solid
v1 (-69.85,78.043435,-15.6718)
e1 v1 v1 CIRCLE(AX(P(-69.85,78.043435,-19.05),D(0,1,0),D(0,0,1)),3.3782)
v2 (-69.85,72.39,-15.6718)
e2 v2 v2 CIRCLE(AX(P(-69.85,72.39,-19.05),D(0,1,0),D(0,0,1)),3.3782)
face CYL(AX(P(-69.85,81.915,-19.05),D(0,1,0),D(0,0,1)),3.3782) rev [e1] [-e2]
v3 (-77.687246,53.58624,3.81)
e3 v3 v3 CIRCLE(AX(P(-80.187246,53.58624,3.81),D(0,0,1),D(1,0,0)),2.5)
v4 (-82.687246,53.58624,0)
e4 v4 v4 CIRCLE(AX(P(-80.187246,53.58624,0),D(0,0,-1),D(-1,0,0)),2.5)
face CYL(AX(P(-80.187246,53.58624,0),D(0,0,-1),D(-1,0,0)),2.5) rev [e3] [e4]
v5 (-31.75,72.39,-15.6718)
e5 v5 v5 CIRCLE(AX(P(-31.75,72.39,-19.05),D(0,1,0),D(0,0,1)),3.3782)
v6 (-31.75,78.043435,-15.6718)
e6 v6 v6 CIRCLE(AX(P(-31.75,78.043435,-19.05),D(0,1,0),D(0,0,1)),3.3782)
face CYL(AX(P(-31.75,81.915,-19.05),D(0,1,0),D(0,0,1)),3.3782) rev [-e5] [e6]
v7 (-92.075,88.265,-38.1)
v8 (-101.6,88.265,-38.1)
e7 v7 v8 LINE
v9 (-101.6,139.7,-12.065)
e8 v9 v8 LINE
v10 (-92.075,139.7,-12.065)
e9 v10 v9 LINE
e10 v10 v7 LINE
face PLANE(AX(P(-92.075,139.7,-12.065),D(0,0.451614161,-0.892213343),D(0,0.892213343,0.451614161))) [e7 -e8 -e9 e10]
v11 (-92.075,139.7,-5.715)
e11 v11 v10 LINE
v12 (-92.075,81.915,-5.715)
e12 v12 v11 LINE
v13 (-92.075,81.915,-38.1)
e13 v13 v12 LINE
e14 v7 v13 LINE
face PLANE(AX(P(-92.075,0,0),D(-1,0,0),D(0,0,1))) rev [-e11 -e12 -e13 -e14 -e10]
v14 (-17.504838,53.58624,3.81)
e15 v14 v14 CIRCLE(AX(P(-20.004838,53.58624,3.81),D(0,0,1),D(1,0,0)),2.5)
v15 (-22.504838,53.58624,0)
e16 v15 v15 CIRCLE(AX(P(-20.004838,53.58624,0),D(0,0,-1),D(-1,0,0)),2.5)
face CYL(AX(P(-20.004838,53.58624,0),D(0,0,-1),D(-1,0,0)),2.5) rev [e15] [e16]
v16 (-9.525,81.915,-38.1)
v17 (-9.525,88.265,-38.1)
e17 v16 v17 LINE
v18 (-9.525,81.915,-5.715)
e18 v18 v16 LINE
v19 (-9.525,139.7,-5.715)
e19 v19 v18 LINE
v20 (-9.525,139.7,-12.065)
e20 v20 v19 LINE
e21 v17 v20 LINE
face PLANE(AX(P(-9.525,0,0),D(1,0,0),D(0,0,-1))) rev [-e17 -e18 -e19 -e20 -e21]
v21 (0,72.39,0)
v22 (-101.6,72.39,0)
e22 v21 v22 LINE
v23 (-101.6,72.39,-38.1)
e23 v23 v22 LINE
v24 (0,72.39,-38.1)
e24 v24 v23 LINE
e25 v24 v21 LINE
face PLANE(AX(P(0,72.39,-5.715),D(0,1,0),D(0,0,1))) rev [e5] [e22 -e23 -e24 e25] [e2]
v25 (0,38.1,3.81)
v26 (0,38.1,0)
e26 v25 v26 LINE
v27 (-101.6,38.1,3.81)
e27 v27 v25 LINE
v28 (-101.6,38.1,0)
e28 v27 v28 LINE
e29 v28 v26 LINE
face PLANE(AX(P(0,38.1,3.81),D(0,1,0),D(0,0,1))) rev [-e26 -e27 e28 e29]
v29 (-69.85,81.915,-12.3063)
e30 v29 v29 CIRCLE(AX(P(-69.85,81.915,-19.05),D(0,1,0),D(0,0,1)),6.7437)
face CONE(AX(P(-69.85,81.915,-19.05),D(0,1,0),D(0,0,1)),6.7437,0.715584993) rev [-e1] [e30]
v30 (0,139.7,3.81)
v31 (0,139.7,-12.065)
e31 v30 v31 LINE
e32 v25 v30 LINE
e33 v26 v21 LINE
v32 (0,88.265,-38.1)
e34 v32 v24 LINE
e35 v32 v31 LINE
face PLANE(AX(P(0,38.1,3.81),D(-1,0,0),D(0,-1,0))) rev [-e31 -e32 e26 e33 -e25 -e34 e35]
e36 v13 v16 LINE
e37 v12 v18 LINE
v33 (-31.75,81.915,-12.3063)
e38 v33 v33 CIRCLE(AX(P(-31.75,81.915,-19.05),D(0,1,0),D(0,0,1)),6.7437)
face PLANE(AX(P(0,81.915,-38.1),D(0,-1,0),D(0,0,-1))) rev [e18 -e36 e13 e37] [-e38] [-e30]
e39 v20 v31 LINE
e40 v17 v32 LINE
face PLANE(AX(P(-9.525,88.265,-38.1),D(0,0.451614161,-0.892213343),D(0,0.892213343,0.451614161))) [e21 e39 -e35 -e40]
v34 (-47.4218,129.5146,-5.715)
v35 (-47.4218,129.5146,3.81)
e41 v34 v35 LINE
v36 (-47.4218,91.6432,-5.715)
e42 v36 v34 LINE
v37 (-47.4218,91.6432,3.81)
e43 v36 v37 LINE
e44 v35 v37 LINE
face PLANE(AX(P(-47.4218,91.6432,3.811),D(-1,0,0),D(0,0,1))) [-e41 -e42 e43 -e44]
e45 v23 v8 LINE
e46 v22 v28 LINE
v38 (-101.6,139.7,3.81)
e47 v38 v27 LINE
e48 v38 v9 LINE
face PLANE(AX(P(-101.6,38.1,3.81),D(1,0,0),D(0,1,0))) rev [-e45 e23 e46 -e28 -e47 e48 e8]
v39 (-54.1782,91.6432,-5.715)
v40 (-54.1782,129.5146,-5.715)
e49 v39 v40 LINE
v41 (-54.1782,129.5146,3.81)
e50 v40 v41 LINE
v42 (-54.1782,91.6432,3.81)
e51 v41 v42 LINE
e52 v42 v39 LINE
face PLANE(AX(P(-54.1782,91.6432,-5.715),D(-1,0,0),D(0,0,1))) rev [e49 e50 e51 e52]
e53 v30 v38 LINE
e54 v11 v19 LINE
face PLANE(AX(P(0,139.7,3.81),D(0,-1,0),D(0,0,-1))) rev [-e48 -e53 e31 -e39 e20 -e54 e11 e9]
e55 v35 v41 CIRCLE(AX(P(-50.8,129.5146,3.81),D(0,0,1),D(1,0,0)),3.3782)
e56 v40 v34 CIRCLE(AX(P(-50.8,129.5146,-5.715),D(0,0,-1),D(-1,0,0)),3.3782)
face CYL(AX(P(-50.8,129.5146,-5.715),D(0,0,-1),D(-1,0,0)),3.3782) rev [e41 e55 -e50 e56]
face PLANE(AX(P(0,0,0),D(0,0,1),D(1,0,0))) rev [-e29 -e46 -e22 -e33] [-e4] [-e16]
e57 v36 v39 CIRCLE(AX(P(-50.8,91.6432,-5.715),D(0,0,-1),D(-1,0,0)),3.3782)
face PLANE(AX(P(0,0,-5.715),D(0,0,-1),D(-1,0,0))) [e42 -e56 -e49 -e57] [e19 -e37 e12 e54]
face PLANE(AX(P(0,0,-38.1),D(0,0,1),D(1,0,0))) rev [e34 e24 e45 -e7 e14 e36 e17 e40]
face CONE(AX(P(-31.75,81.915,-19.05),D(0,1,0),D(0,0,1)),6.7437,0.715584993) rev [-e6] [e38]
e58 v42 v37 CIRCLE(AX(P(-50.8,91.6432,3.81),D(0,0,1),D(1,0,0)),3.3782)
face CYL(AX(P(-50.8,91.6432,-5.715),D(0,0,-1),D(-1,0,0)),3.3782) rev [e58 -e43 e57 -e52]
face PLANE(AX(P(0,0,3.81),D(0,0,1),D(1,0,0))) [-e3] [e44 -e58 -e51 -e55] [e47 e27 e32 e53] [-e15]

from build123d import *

# Parameters (mm, degrees)
SKETCH1_W                                           = 101.6
SKETCH1_H                                           = 101.6
BOSS_EXTRUDE1_DEPTH                                 = 3.81
M6X1_0_TAPPED_HOLE1_D                               = 5
M6X1_0_TAPPED_HOLE1_DEPTH                           = 14.986
M6X1_0_TAPPED_HOLE1_TIP                             = 1.502151548
SKETCH4_W                                           = 101.6
SKETCH4_H                                           = 67.31
BOSS_EXTRUDE2_DEPTH                                 = 5.715
SKETCH7_W                                           = 101.6
SKETCH7_H                                           = 9.525
BOSS_EXTRUDE3_DEPTH                                 = 32.385
DZ_START                                            = -5.715
DZ_SLOT_DEPTH                                       = 9.525
RIB_1_BOSS_EXTRUDE4_DEPTH                           = 9.525
RIB_2_BOSS_EXTRUDE5_DEPTH                           = 9.525
CSK_FOR_1_4_FLAT_HEAD_SOCKET_CAP_SCREW1_D           = 6.7564
CSK_FOR_1_4_FLAT_HEAD_SOCKET_CAP_SCREW1_CSINK_D     = 13.4874
CSK_FOR_1_4_FLAT_HEAD_SOCKET_CAP_SCREW1_CSINK_ANGLE = 82


# Read off the part's stored shape, not the designer's step: dz slot
with BuildPart() as part:
    # Sketch1 → Boss-Extrude1 (new body)
    with BuildSketch(Plane.XY):
        with Locations((-50.8, 88.9)):
            Rectangle(SKETCH1_W, SKETCH1_H)
    extrude(amount=BOSS_EXTRUDE1_DEPTH)

    # M6x1.0 Tapped Hole1
    with Locations(Plane(origin=(-50.8, 0, 0), x_dir=(-1, 0, 0), z_dir=(0, 0, -1))):
        with Locations((-30.795161674, 53.586240129), (29.387245779, 53.586240129)):
            Hole(M6X1_0_TAPPED_HOLE1_D / 2, depth=M6X1_0_TAPPED_HOLE1_DEPTH)
            with Locations((0, 0, -(M6X1_0_TAPPED_HOLE1_DEPTH + M6X1_0_TAPPED_HOLE1_TIP / 2))):  # 118° drill point
                Cone(0, M6X1_0_TAPPED_HOLE1_D / 2, M6X1_0_TAPPED_HOLE1_TIP, mode=Mode.SUBTRACT)

    # Sketch4 → Boss-Extrude2 (add)
    with BuildSketch(Plane(origin=(0, 0, 0), x_dir=(-1, 0, 0), z_dir=(0, 0, -1))):
        with Locations((50.8, 106.045)):
            Rectangle(SKETCH4_W, SKETCH4_H)
    extrude(amount=BOSS_EXTRUDE2_DEPTH)

    # Sketch7 → Boss-Extrude3 (add)
    with BuildSketch(Plane(origin=(0, 0, -5.715), x_dir=(-1, 0, 0), z_dir=(0, 0, -1))):
        with Locations((50.8, 77.1525)):
            Rectangle(SKETCH7_W, SKETCH7_H)
    extrude(amount=BOSS_EXTRUDE3_DEPTH)

    # dz slot outline → dz slot (cut)
    with BuildSketch(Plane.XY.offset(DZ_START)):
        with BuildLine():
            ThreePointArc((-47.4218, 129.5146), (-50.8, 132.8928), (-54.1782, 129.5146))
            Line((-54.1782, 129.5146), (-54.1782, 91.6432))
            ThreePointArc((-54.1782, 91.6432), (-50.8, 88.265), (-47.4218, 91.6432))
            Line((-47.4218, 91.6432), (-47.4218, 129.5146))
        make_face()
    extrude(amount=DZ_SLOT_DEPTH, mode=Mode.SUBTRACT)

    # rib 1 Sketch9 → rib 1 Boss-Extrude4 (add)
    with BuildSketch(Plane(origin=(0, 0, 0), x_dir=(0, 0, -1), z_dir=(1, 0, 0))):
        Polygon((38.1, 81.915), (38.1, 88.265), (12.065, 139.7), (5.715, 139.7), (5.715, 81.915), align=None)
    extrude(amount=-RIB_1_BOSS_EXTRUDE4_DEPTH)

    # Sketch10 → rib 2 Boss-Extrude5 (add)
    with BuildSketch(Plane.ZY.offset(101.6)):
        Polygon((-38.1, 81.915), (-5.715, 81.915), (-5.715, 139.7), (-12.065, 139.7), (-38.1, 88.265), align=None)
    extrude(amount=-RIB_2_BOSS_EXTRUDE5_DEPTH)

    # CSK for 1/4 Flat Head Socket Cap Screw1 (through all)
    with Locations(Plane(origin=(-50.8, 81.915, -38.1), x_dir=(1, 0, 0), z_dir=(0, 1, 0))):
        with Locations((19.05, -19.05), (-19.05, -19.05)):
            CounterSinkHole(CSK_FOR_1_4_FLAT_HEAD_SOCKET_CAP_SCREW1_D / 2, CSK_FOR_1_4_FLAT_HEAD_SOCKET_CAP_SCREW1_CSINK_D / 2, counter_sink_angle=CSK_FOR_1_4_FLAT_HEAD_SOCKET_CAP_SCREW1_CSINK_ANGLE)


solid = part.part
